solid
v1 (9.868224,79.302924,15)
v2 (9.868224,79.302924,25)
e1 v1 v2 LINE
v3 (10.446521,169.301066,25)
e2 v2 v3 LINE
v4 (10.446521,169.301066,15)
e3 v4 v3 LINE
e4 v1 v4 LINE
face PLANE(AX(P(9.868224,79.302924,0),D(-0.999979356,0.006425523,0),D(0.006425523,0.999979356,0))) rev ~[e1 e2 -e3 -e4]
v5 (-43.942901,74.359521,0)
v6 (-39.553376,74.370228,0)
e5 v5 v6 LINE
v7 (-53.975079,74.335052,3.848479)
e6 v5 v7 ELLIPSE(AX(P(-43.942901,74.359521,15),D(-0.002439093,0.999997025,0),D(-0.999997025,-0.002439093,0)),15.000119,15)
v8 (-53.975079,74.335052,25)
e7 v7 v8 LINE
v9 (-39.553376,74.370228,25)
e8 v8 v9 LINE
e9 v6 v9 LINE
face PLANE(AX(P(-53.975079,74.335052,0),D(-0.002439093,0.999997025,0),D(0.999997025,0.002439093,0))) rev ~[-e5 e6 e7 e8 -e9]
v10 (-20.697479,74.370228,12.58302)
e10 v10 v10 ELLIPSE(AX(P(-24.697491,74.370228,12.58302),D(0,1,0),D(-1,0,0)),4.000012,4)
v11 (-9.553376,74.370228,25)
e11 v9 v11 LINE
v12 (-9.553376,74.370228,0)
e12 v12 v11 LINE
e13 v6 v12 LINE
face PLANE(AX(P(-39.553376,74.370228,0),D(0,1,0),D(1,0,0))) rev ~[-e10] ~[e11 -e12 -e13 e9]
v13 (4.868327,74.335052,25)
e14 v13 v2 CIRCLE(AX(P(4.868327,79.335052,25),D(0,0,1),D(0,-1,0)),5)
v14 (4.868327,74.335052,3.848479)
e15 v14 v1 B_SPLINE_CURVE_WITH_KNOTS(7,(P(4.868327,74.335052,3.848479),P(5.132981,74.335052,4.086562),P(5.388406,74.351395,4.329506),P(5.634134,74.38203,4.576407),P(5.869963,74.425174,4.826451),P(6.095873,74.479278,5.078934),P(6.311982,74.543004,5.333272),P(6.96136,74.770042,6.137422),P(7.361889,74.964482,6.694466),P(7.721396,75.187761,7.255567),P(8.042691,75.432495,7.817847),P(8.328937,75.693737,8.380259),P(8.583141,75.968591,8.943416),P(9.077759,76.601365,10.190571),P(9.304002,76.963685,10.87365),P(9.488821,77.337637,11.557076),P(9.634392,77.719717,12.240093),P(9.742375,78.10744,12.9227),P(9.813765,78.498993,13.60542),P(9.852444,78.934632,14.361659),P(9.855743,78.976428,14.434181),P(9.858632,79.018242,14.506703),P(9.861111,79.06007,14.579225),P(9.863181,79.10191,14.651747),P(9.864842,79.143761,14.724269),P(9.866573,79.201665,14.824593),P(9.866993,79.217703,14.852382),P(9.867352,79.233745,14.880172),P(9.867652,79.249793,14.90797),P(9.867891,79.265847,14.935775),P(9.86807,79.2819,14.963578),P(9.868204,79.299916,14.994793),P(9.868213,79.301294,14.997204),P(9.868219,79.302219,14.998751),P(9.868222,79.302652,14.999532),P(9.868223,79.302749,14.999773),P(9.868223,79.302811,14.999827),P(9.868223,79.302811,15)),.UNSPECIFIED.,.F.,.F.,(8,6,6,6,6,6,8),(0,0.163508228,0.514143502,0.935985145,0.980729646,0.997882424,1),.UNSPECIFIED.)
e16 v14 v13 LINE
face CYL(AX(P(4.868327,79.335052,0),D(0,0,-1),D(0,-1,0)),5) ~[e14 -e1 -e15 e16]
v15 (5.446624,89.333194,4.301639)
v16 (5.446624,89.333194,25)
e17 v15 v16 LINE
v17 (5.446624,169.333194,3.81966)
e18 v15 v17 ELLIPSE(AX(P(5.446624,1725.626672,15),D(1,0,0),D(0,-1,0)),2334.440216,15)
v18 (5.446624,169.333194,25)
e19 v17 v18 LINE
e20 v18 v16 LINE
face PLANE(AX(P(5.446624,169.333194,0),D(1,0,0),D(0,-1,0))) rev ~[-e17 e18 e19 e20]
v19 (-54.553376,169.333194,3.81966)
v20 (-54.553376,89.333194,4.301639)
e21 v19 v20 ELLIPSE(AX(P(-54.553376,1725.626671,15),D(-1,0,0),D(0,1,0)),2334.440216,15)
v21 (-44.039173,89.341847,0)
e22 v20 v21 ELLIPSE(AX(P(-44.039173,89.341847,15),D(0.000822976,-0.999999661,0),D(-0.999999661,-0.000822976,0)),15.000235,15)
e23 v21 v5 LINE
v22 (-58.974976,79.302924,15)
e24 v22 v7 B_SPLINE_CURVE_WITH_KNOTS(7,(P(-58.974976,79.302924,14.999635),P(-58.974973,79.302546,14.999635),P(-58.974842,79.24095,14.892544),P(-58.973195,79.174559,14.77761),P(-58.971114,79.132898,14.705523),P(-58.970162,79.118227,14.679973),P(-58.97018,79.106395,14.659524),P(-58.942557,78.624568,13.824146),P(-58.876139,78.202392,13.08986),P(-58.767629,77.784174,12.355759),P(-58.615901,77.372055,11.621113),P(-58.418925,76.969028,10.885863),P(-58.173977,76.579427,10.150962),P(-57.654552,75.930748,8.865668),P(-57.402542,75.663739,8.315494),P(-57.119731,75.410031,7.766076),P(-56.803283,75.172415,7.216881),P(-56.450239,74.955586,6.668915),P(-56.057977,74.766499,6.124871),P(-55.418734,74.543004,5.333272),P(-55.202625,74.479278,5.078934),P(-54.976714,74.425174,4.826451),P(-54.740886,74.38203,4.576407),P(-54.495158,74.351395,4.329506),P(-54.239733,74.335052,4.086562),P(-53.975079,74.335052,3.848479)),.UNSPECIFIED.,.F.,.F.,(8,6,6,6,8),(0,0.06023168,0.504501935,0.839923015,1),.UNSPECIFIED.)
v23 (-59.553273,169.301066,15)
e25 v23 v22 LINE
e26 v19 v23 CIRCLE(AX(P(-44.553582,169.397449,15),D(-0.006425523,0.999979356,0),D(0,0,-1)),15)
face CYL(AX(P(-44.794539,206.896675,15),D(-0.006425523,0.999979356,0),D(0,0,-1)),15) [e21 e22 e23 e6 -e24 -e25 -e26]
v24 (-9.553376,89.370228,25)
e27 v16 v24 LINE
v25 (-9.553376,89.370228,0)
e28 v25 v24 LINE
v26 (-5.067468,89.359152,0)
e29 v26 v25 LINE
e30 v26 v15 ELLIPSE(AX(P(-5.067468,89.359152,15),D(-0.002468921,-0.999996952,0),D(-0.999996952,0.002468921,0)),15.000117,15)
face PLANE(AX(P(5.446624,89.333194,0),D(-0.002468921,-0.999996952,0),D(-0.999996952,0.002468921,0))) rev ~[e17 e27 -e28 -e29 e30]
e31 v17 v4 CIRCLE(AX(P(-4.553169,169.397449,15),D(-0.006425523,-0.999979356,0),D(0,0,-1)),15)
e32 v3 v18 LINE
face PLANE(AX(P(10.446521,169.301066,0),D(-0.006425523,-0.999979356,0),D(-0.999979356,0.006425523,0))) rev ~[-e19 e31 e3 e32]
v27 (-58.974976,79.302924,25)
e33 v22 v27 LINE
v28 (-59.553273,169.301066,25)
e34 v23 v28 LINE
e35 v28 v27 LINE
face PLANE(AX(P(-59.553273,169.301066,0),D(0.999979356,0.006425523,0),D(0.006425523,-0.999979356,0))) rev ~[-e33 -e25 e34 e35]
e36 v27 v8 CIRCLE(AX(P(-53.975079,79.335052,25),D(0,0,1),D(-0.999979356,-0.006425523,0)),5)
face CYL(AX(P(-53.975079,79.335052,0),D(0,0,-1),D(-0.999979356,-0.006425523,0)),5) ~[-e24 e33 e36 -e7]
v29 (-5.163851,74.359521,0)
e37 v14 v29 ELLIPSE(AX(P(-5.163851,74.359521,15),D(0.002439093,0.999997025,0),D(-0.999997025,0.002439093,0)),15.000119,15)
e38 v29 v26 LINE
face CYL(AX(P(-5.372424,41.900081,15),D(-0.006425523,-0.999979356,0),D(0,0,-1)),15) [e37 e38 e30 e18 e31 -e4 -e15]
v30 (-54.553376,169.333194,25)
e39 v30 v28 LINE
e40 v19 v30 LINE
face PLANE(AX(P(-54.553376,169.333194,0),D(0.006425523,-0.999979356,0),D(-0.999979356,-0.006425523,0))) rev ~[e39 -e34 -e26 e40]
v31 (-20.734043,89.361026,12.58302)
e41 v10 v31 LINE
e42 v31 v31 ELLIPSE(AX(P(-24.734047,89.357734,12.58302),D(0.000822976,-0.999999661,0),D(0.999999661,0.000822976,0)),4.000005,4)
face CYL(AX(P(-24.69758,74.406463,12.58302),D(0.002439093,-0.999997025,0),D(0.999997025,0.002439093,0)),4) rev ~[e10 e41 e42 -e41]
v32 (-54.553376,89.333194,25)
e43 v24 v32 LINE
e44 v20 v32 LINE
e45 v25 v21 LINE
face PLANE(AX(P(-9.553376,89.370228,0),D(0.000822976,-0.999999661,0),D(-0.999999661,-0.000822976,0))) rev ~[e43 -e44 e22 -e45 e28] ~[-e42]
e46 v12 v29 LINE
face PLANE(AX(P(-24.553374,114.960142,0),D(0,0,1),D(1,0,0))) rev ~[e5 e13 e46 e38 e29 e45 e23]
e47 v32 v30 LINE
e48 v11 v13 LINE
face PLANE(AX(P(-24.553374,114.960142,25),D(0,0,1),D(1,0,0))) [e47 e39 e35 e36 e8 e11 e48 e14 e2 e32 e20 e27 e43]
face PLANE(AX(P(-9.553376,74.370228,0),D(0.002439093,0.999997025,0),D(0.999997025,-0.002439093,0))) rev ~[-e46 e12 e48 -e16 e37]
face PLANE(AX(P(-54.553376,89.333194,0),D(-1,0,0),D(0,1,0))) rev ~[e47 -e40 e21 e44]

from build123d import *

# Parameters (mm, degrees)
F1_DEPTH    = 25
F2_R        = 4
F3_DEPTH    = 17.8
F4_DEPTH    = 25
F5_T1_DEPTH = 165
F6_T1_DEPTH = 165


# Not quite as in the source:
# - a fillet or chamfer that OpenCascade refuses, or shapes differently, is made with other operations: its cross-section is extruded or revolved along the edge and cut away or added


with BuildPart() as f1:
    # F0 (on Top) → F1 (new body)
    with BuildSketch(Plane.XY):
        with BuildLine():
            ThreePointArc((4.8683269703, 74.3350517786), (8.3924837429, 75.788177233), (9.8682237508, 79.3029241619))
            Line((9.8682237508, 79.3029241619), (10.446520851, 169.3010662119))
            Line((10.446520851, 169.3010662119), (5.4466240705, 169.3331938286))
            Line((5.4466240705, 169.3331938286), (5.4466240705, 89.3331938286))
            Line((5.4466240705, 89.3331938286), (-9.5533759295, 89.3702277541))
            Line((-9.5533759295, 89.3702277541), (-54.5533759295, 89.3331938286))
            Line((-54.5533759295, 89.3331938286), (-54.5533759295, 169.3331938286))
            Line((-54.5533759295, 169.3331938286), (-59.5532727101, 169.3010662119))
            Line((-59.5532727101, 169.3010662119), (-58.9749756099, 79.3029241619))
            ThreePointArc((-58.9749756099, 79.3029241619), (-57.499235602, 75.788177233), (-53.9750788293, 74.3350517786))
            Line((-53.9750788293, 74.3350517786), (-39.5533759295, 74.3702277541))
            Line((-39.5533759295, 74.3702277541), (-9.5533759295, 74.3702277541))
            Line((-9.5533759295, 74.3702277541), (4.8683269703, 74.3350517786))
        make_face()
    extrude(amount=F1_DEPTH)

    # F2 (on face) → F3 (cut)
    with BuildSketch(Plane(origin=(-0.1816306533, 74.4662593781, 0), x_dir=(0.9999970254, 0.0024390927, 0), z_dir=(0.0024390927, -0.9999970254, 0))):
        with Locations((-24.5160218328, 12.5830201432)):
            Circle(F2_R)
    extrude(amount=-F3_DEPTH, mode=Mode.SUBTRACT)

    # F4 (cut): a face of the model
    f4_faces = [f1.faces().sort_by_distance(p)[0] for p in [
        (-24.697579561, 74.4064625271, 12.5830201432),
    ]]
    extrude(f4_faces, amount=-F4_DEPTH, mode=Mode.SUBTRACT)

    # F5: fillet of radius 15 on 1 edges, made by hand

    # F5_s2 → F5_t1 (cut)
    with BuildSketch(Plane(origin=(0.2690025781, 41.8638312931, 0), x_dir=(0, 0, 1), z_dir=(0.0064255233, 0.9999793561, 0))):
        with BuildLine():
            ThreePointArc((0, -5.6415427574), (4.3933982822, 4.9650589604), (15, 9.3584572426))
            Line((15, 9.3584572426), (0, 9.3584572426))
            Line((0, 9.3584572426), (0, -5.6415427574))
        make_face()
    extrude(amount=F5_T1_DEPTH, mode=Mode.SUBTRACT)

    # F6: fillet of radius 15 on 1 edges, made by hand

    # F6_s2 → F6_t1 (cut)
    with BuildSketch(Plane(origin=(-1.3312414161, 207.1759551176, 0), x_dir=(0, 0, 1), z_dir=(0.0064255233, -0.9999793561, 0))):
        with BuildLine():
            ThreePointArc((0, 43.4641953473), (4.3933982822, 54.0707970651), (15, 58.4641953473))
            Line((15, 58.4641953473), (0, 58.4641953473))
            Line((0, 58.4641953473), (0, 43.4641953473))
        make_face()
    extrude(amount=F6_T1_DEPTH, mode=Mode.SUBTRACT)


solid = f1.part
